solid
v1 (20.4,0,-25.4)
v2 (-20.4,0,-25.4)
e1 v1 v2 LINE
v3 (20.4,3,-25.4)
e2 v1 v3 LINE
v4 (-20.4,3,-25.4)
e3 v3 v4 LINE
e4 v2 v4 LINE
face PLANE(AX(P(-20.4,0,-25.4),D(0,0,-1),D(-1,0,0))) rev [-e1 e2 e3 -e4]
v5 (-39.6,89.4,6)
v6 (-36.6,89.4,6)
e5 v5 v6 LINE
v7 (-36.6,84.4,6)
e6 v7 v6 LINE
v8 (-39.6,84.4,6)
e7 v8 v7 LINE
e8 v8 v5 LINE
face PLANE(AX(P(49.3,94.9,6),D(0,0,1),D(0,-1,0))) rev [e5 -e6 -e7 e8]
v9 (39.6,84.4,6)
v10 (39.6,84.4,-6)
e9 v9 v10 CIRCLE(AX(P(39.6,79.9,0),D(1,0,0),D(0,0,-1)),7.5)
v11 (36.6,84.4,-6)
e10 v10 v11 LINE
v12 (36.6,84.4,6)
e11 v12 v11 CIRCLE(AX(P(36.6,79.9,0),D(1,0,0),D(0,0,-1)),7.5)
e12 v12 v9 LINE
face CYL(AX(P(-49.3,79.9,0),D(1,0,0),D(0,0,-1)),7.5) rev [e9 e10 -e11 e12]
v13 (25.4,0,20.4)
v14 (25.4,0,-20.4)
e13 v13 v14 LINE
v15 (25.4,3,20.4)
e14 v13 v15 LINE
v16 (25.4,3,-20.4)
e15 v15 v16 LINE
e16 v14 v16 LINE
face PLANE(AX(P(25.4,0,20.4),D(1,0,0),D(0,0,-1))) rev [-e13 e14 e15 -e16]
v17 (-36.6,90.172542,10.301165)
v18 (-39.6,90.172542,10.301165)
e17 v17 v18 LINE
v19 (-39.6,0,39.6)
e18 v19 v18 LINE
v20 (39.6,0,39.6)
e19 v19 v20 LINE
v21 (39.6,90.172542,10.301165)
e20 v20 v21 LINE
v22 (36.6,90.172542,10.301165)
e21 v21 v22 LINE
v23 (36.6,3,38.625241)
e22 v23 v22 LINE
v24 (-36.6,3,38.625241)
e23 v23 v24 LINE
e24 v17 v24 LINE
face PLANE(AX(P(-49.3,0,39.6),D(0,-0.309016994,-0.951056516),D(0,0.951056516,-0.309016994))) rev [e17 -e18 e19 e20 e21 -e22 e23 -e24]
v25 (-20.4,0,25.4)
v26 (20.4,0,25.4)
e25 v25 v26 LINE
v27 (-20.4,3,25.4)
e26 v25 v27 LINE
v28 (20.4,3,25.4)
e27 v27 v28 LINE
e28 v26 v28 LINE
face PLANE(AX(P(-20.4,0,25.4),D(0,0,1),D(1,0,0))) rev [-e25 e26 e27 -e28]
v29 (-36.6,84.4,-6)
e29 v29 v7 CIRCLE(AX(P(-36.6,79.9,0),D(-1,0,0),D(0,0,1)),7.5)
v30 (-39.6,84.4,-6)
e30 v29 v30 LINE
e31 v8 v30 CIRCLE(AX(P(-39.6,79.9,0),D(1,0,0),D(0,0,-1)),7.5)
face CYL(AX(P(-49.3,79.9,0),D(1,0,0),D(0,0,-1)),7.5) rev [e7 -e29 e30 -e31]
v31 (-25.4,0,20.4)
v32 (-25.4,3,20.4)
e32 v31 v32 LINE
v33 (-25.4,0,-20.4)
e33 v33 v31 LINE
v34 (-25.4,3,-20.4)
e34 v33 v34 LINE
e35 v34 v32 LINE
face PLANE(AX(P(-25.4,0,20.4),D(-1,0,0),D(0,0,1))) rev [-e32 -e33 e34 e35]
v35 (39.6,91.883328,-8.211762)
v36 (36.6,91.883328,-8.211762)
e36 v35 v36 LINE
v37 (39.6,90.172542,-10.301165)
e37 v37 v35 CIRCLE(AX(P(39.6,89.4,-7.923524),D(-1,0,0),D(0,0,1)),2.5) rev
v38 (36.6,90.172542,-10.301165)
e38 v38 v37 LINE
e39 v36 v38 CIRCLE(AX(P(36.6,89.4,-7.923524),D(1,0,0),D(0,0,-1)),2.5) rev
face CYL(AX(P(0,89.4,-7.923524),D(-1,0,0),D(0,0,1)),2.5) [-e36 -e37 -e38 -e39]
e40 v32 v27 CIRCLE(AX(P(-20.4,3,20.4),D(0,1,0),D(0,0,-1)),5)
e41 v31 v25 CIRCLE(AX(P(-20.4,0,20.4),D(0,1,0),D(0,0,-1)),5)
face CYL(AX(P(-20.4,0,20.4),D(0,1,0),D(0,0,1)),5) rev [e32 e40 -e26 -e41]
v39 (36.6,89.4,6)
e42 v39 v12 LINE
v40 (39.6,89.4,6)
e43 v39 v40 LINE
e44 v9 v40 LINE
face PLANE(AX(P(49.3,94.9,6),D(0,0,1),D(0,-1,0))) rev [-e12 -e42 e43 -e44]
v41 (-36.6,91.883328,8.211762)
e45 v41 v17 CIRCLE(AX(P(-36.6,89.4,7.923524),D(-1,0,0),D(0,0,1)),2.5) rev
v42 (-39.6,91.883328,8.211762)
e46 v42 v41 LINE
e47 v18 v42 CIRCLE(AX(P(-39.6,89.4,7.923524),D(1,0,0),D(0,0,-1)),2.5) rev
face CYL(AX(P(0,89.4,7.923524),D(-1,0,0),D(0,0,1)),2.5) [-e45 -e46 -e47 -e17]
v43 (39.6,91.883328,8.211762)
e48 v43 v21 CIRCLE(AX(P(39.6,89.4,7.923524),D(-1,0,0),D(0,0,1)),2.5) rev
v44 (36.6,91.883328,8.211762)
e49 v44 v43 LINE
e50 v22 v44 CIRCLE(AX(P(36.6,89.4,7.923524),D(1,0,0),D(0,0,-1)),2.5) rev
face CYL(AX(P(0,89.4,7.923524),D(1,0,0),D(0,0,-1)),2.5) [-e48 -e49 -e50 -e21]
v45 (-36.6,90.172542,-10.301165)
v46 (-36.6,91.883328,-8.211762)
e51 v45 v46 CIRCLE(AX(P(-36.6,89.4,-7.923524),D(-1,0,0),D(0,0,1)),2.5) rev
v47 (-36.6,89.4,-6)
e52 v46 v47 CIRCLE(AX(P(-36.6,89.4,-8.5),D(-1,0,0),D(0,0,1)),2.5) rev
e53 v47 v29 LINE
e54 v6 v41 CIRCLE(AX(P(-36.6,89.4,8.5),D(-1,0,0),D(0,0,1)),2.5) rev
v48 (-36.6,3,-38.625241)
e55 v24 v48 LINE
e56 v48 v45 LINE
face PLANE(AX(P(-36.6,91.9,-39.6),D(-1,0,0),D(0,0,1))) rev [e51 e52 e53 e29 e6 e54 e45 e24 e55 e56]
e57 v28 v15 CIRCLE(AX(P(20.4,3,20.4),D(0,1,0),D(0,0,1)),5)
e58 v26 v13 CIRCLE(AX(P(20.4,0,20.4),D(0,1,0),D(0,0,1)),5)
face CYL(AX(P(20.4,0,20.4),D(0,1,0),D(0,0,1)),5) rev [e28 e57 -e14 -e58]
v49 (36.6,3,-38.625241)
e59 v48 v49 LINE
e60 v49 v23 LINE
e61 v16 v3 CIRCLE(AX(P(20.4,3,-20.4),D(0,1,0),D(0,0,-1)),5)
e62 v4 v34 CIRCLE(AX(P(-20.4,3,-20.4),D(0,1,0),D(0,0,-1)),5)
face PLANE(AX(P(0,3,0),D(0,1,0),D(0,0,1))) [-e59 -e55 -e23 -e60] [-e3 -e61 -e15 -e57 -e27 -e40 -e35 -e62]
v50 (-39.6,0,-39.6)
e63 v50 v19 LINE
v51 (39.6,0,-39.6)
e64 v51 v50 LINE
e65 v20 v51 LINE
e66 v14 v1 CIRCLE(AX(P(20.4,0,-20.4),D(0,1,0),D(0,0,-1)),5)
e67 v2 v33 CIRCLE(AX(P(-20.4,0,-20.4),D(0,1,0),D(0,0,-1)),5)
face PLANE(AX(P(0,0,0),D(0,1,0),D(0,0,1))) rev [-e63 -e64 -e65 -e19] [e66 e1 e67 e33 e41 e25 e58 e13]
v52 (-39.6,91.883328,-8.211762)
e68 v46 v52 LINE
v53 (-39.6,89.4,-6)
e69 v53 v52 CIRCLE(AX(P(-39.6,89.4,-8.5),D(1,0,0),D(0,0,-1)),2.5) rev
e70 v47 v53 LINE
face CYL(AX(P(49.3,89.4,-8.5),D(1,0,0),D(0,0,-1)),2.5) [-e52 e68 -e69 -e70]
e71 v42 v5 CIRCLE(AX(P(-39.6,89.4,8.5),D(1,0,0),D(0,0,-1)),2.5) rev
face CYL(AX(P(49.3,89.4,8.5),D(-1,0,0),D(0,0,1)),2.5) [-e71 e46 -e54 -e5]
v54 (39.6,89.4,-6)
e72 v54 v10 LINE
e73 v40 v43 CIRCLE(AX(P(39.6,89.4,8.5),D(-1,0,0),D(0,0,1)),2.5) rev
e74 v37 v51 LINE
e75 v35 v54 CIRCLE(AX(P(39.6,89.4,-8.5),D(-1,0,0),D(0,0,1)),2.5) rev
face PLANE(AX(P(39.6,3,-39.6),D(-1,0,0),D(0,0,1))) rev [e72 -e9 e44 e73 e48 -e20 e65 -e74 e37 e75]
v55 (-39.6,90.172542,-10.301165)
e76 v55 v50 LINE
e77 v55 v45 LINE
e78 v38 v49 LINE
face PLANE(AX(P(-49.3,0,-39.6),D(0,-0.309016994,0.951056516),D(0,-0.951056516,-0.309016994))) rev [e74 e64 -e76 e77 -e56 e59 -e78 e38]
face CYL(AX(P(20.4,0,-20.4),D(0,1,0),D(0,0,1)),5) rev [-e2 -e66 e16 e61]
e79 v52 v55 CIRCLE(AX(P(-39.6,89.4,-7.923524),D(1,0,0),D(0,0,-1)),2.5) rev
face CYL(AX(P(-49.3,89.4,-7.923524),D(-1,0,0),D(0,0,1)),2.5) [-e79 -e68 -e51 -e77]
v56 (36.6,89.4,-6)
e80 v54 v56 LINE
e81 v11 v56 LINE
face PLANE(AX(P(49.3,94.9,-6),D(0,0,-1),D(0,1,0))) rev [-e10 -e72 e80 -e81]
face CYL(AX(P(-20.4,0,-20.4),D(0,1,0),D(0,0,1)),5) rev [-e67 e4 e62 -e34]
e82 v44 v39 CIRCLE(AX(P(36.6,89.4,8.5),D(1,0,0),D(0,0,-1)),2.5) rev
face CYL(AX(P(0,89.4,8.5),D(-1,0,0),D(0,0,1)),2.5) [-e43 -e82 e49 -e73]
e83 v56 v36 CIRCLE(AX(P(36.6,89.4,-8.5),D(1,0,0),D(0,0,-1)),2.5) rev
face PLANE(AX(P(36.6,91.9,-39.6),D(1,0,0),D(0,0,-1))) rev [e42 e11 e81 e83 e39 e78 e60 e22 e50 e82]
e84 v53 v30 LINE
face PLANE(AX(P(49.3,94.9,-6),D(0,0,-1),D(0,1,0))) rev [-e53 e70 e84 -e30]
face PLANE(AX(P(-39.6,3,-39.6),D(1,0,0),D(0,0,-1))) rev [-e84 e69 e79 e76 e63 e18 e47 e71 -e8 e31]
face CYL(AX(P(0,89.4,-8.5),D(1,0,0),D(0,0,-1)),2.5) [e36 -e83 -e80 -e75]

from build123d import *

# Parameters (mm, degrees)
SKETCH1_W           = 79.2
SKETCH1_H           = 79.2
BOSS_EXTRUDE1_DEPTH = 3
CUT_EXTRUDE1_DEPTH  = 3
SKETCH3_W           = 3
SKETCH3_H           = 79.2
BOSS_EXTRUDE2_DEPTH = 88.9
CUT_EXTRUDE2_DEPTH  = 88.9
SKETCH5_R           = 7.5
CUT_EXTRUDE3_DEPTH  = 88.9
SKETCH6_W           = 12
SKETCH6_H           = 15
CUT_EXTRUDE4_DEPTH  = 88.9
FILLET1_R           = 2.5


with BuildPart() as part:
    # Sketch1 → Boss-Extrude1 (new body)
    with BuildSketch(Plane(origin=(0, 0, 0), x_dir=(1, 0, 0), z_dir=(0, 1, 0))):
        Rectangle(SKETCH1_W, SKETCH1_H)
    extrude(amount=BOSS_EXTRUDE1_DEPTH)

    # Sketch2 → Cut-Extrude1 (cut)
    with BuildSketch(Plane(origin=(0, 3, 0), x_dir=(1, 0, 0), z_dir=(0, 1, 0))):
        with BuildLine():
            Line((-20.4, -25.4), (20.4, -25.4))
            ThreePointArc((20.4, -25.4), (23.935533906, -23.935533906), (25.4, -20.4))
            Line((25.4, -20.4), (25.4, 20.4))
            ThreePointArc((25.4, 20.4), (23.935533906, 23.935533906), (20.4, 25.4))
            Line((20.4, 25.4), (-20.4, 25.4))
            ThreePointArc((-20.4, 25.4), (-23.935533906, 23.935533906), (-25.4, 20.4))
            Line((-25.4, 20.4), (-25.4, -20.4))
            ThreePointArc((-25.4, -20.4), (-23.935533906, -23.935533906), (-20.4, -25.4))
        make_face()
    extrude(amount=-CUT_EXTRUDE1_DEPTH, mode=Mode.SUBTRACT)

    # Sketch3 → Boss-Extrude2 (add)
    with BuildSketch(Plane(origin=(0, 3, 0), x_dir=(1, 0, 0), z_dir=(0, 1, 0))):
        with Locations((-38.1, 0)):
            Rectangle(SKETCH3_W, SKETCH3_H)
        with Locations((38.1, 0)):
            Rectangle(SKETCH3_W, SKETCH3_H)
    extrude(amount=BOSS_EXTRUDE2_DEPTH)

    # Sketch4 → Cut-Extrude2 (cut)
    with BuildSketch(Plane(origin=(39.6, 0, 0), x_dir=(0, 0, -1), z_dir=(1, 0, 0))):
        Polygon((-39.6, 0), (-9.739879916, 91.9), (-41.709880552, 102.287682895), (-62.726275387, 13.336826297), align=None)
        Polygon((39.6, 0), (9.739879916, 91.9), (57.349998408, 101.564802913), align=None)
    extrude(amount=-CUT_EXTRUDE2_DEPTH, mode=Mode.SUBTRACT)

    # Sketch5 → Cut-Extrude3 (cut)
    with BuildSketch(Plane(origin=(39.6, 0, 0), x_dir=(0, 0, -1), z_dir=(1, 0, 0))):
        with Locations((0, 79.9)):
            Circle(SKETCH5_R)
    extrude(amount=-CUT_EXTRUDE3_DEPTH, mode=Mode.SUBTRACT)

    # Sketch6 → Cut-Extrude4 (cut)
    with BuildSketch(Plane.ZY.offset(39.6)):
        with Locations((0, 87.4)):
            Rectangle(SKETCH6_W, SKETCH6_H)
    extrude(amount=-CUT_EXTRUDE4_DEPTH, mode=Mode.SUBTRACT)

    # Fillet1
    # the kernel refuses this fillet: 2.5 mm, written as the material it takes off along each edge
    with BuildSketch(Plane(origin=(45.85, 91.9, 6), x_dir=(0, 0, 1), z_dir=(-1, 0, 0)), Plane(origin=(-30.35, 91.9, -6), x_dir=(0, -1, 0), z_dir=(-1, 0, 0))) as fillet1_piece_1:
        with BuildLine():
            CenterArc((FILLET1_R, -FILLET1_R), FILLET1_R, 90, 90)
            Line((0, -FILLET1_R), (0, 0))
            Line((0, 0), (FILLET1_R, 0))
        make_face()
    extrude(amount=15.5, mode=Mode.SUBTRACT)
    with BuildSketch(Plane(origin=(44.1408908, 91.9, 9.739879916), x_dir=(0, 0, -1), z_dir=(-1, 0, 0)), Plane(origin=(-32.0591092, 91.9, 9.739879916), x_dir=(0, 0, -1), z_dir=(-1, 0, 0))) as fillet1_piece_2:
        with BuildLine():
            CenterArc((FILLET1_R * 0.726542528005, FILLET1_R), FILLET1_R, 198, 72)
            Line((-FILLET1_R * 0.22451398829, FILLET1_R * 0.690983005625), (0, 0))
            Line((0, 0), (FILLET1_R * 0.726542528005, 0))
        make_face()
    extrude(amount=12.0817816, mode=Mode.SUBTRACT)
    with BuildSketch(Plane(origin=(30.35, 91.9, -6), x_dir=(0, -1, 0), z_dir=(1, 0, 0)), Plane(origin=(-45.85, 91.9, 6), x_dir=(0, 0, 1), z_dir=(1, 0, 0))) as fillet1_piece_3:
        with BuildLine():
            CenterArc((FILLET1_R, FILLET1_R), FILLET1_R, 180, 90)
            Line((0, FILLET1_R), (0, 0))
            Line((0, 0), (FILLET1_R, 0))
        make_face()
    extrude(amount=15.5, mode=Mode.SUBTRACT)
    with BuildSketch(Plane(origin=(44.1408908, 91.9, -9.739879916), x_dir=(0, 0, 1), z_dir=(-1, 0, 0)), Plane(origin=(-32.0591092, 91.9, -9.739879916), x_dir=(0, 0, 1), z_dir=(-1, 0, 0))) as fillet1_piece_4:
        with BuildLine():
            CenterArc((FILLET1_R * 0.726542528005, -FILLET1_R), FILLET1_R, 90, 72)
            Line((-FILLET1_R * 0.22451398829, -FILLET1_R * 0.690983005625), (0, 0))
            Line((0, 0), (FILLET1_R * 0.726542528005, 0))
        make_face()
    extrude(amount=12.0817816, mode=Mode.SUBTRACT)


solid = part.part
